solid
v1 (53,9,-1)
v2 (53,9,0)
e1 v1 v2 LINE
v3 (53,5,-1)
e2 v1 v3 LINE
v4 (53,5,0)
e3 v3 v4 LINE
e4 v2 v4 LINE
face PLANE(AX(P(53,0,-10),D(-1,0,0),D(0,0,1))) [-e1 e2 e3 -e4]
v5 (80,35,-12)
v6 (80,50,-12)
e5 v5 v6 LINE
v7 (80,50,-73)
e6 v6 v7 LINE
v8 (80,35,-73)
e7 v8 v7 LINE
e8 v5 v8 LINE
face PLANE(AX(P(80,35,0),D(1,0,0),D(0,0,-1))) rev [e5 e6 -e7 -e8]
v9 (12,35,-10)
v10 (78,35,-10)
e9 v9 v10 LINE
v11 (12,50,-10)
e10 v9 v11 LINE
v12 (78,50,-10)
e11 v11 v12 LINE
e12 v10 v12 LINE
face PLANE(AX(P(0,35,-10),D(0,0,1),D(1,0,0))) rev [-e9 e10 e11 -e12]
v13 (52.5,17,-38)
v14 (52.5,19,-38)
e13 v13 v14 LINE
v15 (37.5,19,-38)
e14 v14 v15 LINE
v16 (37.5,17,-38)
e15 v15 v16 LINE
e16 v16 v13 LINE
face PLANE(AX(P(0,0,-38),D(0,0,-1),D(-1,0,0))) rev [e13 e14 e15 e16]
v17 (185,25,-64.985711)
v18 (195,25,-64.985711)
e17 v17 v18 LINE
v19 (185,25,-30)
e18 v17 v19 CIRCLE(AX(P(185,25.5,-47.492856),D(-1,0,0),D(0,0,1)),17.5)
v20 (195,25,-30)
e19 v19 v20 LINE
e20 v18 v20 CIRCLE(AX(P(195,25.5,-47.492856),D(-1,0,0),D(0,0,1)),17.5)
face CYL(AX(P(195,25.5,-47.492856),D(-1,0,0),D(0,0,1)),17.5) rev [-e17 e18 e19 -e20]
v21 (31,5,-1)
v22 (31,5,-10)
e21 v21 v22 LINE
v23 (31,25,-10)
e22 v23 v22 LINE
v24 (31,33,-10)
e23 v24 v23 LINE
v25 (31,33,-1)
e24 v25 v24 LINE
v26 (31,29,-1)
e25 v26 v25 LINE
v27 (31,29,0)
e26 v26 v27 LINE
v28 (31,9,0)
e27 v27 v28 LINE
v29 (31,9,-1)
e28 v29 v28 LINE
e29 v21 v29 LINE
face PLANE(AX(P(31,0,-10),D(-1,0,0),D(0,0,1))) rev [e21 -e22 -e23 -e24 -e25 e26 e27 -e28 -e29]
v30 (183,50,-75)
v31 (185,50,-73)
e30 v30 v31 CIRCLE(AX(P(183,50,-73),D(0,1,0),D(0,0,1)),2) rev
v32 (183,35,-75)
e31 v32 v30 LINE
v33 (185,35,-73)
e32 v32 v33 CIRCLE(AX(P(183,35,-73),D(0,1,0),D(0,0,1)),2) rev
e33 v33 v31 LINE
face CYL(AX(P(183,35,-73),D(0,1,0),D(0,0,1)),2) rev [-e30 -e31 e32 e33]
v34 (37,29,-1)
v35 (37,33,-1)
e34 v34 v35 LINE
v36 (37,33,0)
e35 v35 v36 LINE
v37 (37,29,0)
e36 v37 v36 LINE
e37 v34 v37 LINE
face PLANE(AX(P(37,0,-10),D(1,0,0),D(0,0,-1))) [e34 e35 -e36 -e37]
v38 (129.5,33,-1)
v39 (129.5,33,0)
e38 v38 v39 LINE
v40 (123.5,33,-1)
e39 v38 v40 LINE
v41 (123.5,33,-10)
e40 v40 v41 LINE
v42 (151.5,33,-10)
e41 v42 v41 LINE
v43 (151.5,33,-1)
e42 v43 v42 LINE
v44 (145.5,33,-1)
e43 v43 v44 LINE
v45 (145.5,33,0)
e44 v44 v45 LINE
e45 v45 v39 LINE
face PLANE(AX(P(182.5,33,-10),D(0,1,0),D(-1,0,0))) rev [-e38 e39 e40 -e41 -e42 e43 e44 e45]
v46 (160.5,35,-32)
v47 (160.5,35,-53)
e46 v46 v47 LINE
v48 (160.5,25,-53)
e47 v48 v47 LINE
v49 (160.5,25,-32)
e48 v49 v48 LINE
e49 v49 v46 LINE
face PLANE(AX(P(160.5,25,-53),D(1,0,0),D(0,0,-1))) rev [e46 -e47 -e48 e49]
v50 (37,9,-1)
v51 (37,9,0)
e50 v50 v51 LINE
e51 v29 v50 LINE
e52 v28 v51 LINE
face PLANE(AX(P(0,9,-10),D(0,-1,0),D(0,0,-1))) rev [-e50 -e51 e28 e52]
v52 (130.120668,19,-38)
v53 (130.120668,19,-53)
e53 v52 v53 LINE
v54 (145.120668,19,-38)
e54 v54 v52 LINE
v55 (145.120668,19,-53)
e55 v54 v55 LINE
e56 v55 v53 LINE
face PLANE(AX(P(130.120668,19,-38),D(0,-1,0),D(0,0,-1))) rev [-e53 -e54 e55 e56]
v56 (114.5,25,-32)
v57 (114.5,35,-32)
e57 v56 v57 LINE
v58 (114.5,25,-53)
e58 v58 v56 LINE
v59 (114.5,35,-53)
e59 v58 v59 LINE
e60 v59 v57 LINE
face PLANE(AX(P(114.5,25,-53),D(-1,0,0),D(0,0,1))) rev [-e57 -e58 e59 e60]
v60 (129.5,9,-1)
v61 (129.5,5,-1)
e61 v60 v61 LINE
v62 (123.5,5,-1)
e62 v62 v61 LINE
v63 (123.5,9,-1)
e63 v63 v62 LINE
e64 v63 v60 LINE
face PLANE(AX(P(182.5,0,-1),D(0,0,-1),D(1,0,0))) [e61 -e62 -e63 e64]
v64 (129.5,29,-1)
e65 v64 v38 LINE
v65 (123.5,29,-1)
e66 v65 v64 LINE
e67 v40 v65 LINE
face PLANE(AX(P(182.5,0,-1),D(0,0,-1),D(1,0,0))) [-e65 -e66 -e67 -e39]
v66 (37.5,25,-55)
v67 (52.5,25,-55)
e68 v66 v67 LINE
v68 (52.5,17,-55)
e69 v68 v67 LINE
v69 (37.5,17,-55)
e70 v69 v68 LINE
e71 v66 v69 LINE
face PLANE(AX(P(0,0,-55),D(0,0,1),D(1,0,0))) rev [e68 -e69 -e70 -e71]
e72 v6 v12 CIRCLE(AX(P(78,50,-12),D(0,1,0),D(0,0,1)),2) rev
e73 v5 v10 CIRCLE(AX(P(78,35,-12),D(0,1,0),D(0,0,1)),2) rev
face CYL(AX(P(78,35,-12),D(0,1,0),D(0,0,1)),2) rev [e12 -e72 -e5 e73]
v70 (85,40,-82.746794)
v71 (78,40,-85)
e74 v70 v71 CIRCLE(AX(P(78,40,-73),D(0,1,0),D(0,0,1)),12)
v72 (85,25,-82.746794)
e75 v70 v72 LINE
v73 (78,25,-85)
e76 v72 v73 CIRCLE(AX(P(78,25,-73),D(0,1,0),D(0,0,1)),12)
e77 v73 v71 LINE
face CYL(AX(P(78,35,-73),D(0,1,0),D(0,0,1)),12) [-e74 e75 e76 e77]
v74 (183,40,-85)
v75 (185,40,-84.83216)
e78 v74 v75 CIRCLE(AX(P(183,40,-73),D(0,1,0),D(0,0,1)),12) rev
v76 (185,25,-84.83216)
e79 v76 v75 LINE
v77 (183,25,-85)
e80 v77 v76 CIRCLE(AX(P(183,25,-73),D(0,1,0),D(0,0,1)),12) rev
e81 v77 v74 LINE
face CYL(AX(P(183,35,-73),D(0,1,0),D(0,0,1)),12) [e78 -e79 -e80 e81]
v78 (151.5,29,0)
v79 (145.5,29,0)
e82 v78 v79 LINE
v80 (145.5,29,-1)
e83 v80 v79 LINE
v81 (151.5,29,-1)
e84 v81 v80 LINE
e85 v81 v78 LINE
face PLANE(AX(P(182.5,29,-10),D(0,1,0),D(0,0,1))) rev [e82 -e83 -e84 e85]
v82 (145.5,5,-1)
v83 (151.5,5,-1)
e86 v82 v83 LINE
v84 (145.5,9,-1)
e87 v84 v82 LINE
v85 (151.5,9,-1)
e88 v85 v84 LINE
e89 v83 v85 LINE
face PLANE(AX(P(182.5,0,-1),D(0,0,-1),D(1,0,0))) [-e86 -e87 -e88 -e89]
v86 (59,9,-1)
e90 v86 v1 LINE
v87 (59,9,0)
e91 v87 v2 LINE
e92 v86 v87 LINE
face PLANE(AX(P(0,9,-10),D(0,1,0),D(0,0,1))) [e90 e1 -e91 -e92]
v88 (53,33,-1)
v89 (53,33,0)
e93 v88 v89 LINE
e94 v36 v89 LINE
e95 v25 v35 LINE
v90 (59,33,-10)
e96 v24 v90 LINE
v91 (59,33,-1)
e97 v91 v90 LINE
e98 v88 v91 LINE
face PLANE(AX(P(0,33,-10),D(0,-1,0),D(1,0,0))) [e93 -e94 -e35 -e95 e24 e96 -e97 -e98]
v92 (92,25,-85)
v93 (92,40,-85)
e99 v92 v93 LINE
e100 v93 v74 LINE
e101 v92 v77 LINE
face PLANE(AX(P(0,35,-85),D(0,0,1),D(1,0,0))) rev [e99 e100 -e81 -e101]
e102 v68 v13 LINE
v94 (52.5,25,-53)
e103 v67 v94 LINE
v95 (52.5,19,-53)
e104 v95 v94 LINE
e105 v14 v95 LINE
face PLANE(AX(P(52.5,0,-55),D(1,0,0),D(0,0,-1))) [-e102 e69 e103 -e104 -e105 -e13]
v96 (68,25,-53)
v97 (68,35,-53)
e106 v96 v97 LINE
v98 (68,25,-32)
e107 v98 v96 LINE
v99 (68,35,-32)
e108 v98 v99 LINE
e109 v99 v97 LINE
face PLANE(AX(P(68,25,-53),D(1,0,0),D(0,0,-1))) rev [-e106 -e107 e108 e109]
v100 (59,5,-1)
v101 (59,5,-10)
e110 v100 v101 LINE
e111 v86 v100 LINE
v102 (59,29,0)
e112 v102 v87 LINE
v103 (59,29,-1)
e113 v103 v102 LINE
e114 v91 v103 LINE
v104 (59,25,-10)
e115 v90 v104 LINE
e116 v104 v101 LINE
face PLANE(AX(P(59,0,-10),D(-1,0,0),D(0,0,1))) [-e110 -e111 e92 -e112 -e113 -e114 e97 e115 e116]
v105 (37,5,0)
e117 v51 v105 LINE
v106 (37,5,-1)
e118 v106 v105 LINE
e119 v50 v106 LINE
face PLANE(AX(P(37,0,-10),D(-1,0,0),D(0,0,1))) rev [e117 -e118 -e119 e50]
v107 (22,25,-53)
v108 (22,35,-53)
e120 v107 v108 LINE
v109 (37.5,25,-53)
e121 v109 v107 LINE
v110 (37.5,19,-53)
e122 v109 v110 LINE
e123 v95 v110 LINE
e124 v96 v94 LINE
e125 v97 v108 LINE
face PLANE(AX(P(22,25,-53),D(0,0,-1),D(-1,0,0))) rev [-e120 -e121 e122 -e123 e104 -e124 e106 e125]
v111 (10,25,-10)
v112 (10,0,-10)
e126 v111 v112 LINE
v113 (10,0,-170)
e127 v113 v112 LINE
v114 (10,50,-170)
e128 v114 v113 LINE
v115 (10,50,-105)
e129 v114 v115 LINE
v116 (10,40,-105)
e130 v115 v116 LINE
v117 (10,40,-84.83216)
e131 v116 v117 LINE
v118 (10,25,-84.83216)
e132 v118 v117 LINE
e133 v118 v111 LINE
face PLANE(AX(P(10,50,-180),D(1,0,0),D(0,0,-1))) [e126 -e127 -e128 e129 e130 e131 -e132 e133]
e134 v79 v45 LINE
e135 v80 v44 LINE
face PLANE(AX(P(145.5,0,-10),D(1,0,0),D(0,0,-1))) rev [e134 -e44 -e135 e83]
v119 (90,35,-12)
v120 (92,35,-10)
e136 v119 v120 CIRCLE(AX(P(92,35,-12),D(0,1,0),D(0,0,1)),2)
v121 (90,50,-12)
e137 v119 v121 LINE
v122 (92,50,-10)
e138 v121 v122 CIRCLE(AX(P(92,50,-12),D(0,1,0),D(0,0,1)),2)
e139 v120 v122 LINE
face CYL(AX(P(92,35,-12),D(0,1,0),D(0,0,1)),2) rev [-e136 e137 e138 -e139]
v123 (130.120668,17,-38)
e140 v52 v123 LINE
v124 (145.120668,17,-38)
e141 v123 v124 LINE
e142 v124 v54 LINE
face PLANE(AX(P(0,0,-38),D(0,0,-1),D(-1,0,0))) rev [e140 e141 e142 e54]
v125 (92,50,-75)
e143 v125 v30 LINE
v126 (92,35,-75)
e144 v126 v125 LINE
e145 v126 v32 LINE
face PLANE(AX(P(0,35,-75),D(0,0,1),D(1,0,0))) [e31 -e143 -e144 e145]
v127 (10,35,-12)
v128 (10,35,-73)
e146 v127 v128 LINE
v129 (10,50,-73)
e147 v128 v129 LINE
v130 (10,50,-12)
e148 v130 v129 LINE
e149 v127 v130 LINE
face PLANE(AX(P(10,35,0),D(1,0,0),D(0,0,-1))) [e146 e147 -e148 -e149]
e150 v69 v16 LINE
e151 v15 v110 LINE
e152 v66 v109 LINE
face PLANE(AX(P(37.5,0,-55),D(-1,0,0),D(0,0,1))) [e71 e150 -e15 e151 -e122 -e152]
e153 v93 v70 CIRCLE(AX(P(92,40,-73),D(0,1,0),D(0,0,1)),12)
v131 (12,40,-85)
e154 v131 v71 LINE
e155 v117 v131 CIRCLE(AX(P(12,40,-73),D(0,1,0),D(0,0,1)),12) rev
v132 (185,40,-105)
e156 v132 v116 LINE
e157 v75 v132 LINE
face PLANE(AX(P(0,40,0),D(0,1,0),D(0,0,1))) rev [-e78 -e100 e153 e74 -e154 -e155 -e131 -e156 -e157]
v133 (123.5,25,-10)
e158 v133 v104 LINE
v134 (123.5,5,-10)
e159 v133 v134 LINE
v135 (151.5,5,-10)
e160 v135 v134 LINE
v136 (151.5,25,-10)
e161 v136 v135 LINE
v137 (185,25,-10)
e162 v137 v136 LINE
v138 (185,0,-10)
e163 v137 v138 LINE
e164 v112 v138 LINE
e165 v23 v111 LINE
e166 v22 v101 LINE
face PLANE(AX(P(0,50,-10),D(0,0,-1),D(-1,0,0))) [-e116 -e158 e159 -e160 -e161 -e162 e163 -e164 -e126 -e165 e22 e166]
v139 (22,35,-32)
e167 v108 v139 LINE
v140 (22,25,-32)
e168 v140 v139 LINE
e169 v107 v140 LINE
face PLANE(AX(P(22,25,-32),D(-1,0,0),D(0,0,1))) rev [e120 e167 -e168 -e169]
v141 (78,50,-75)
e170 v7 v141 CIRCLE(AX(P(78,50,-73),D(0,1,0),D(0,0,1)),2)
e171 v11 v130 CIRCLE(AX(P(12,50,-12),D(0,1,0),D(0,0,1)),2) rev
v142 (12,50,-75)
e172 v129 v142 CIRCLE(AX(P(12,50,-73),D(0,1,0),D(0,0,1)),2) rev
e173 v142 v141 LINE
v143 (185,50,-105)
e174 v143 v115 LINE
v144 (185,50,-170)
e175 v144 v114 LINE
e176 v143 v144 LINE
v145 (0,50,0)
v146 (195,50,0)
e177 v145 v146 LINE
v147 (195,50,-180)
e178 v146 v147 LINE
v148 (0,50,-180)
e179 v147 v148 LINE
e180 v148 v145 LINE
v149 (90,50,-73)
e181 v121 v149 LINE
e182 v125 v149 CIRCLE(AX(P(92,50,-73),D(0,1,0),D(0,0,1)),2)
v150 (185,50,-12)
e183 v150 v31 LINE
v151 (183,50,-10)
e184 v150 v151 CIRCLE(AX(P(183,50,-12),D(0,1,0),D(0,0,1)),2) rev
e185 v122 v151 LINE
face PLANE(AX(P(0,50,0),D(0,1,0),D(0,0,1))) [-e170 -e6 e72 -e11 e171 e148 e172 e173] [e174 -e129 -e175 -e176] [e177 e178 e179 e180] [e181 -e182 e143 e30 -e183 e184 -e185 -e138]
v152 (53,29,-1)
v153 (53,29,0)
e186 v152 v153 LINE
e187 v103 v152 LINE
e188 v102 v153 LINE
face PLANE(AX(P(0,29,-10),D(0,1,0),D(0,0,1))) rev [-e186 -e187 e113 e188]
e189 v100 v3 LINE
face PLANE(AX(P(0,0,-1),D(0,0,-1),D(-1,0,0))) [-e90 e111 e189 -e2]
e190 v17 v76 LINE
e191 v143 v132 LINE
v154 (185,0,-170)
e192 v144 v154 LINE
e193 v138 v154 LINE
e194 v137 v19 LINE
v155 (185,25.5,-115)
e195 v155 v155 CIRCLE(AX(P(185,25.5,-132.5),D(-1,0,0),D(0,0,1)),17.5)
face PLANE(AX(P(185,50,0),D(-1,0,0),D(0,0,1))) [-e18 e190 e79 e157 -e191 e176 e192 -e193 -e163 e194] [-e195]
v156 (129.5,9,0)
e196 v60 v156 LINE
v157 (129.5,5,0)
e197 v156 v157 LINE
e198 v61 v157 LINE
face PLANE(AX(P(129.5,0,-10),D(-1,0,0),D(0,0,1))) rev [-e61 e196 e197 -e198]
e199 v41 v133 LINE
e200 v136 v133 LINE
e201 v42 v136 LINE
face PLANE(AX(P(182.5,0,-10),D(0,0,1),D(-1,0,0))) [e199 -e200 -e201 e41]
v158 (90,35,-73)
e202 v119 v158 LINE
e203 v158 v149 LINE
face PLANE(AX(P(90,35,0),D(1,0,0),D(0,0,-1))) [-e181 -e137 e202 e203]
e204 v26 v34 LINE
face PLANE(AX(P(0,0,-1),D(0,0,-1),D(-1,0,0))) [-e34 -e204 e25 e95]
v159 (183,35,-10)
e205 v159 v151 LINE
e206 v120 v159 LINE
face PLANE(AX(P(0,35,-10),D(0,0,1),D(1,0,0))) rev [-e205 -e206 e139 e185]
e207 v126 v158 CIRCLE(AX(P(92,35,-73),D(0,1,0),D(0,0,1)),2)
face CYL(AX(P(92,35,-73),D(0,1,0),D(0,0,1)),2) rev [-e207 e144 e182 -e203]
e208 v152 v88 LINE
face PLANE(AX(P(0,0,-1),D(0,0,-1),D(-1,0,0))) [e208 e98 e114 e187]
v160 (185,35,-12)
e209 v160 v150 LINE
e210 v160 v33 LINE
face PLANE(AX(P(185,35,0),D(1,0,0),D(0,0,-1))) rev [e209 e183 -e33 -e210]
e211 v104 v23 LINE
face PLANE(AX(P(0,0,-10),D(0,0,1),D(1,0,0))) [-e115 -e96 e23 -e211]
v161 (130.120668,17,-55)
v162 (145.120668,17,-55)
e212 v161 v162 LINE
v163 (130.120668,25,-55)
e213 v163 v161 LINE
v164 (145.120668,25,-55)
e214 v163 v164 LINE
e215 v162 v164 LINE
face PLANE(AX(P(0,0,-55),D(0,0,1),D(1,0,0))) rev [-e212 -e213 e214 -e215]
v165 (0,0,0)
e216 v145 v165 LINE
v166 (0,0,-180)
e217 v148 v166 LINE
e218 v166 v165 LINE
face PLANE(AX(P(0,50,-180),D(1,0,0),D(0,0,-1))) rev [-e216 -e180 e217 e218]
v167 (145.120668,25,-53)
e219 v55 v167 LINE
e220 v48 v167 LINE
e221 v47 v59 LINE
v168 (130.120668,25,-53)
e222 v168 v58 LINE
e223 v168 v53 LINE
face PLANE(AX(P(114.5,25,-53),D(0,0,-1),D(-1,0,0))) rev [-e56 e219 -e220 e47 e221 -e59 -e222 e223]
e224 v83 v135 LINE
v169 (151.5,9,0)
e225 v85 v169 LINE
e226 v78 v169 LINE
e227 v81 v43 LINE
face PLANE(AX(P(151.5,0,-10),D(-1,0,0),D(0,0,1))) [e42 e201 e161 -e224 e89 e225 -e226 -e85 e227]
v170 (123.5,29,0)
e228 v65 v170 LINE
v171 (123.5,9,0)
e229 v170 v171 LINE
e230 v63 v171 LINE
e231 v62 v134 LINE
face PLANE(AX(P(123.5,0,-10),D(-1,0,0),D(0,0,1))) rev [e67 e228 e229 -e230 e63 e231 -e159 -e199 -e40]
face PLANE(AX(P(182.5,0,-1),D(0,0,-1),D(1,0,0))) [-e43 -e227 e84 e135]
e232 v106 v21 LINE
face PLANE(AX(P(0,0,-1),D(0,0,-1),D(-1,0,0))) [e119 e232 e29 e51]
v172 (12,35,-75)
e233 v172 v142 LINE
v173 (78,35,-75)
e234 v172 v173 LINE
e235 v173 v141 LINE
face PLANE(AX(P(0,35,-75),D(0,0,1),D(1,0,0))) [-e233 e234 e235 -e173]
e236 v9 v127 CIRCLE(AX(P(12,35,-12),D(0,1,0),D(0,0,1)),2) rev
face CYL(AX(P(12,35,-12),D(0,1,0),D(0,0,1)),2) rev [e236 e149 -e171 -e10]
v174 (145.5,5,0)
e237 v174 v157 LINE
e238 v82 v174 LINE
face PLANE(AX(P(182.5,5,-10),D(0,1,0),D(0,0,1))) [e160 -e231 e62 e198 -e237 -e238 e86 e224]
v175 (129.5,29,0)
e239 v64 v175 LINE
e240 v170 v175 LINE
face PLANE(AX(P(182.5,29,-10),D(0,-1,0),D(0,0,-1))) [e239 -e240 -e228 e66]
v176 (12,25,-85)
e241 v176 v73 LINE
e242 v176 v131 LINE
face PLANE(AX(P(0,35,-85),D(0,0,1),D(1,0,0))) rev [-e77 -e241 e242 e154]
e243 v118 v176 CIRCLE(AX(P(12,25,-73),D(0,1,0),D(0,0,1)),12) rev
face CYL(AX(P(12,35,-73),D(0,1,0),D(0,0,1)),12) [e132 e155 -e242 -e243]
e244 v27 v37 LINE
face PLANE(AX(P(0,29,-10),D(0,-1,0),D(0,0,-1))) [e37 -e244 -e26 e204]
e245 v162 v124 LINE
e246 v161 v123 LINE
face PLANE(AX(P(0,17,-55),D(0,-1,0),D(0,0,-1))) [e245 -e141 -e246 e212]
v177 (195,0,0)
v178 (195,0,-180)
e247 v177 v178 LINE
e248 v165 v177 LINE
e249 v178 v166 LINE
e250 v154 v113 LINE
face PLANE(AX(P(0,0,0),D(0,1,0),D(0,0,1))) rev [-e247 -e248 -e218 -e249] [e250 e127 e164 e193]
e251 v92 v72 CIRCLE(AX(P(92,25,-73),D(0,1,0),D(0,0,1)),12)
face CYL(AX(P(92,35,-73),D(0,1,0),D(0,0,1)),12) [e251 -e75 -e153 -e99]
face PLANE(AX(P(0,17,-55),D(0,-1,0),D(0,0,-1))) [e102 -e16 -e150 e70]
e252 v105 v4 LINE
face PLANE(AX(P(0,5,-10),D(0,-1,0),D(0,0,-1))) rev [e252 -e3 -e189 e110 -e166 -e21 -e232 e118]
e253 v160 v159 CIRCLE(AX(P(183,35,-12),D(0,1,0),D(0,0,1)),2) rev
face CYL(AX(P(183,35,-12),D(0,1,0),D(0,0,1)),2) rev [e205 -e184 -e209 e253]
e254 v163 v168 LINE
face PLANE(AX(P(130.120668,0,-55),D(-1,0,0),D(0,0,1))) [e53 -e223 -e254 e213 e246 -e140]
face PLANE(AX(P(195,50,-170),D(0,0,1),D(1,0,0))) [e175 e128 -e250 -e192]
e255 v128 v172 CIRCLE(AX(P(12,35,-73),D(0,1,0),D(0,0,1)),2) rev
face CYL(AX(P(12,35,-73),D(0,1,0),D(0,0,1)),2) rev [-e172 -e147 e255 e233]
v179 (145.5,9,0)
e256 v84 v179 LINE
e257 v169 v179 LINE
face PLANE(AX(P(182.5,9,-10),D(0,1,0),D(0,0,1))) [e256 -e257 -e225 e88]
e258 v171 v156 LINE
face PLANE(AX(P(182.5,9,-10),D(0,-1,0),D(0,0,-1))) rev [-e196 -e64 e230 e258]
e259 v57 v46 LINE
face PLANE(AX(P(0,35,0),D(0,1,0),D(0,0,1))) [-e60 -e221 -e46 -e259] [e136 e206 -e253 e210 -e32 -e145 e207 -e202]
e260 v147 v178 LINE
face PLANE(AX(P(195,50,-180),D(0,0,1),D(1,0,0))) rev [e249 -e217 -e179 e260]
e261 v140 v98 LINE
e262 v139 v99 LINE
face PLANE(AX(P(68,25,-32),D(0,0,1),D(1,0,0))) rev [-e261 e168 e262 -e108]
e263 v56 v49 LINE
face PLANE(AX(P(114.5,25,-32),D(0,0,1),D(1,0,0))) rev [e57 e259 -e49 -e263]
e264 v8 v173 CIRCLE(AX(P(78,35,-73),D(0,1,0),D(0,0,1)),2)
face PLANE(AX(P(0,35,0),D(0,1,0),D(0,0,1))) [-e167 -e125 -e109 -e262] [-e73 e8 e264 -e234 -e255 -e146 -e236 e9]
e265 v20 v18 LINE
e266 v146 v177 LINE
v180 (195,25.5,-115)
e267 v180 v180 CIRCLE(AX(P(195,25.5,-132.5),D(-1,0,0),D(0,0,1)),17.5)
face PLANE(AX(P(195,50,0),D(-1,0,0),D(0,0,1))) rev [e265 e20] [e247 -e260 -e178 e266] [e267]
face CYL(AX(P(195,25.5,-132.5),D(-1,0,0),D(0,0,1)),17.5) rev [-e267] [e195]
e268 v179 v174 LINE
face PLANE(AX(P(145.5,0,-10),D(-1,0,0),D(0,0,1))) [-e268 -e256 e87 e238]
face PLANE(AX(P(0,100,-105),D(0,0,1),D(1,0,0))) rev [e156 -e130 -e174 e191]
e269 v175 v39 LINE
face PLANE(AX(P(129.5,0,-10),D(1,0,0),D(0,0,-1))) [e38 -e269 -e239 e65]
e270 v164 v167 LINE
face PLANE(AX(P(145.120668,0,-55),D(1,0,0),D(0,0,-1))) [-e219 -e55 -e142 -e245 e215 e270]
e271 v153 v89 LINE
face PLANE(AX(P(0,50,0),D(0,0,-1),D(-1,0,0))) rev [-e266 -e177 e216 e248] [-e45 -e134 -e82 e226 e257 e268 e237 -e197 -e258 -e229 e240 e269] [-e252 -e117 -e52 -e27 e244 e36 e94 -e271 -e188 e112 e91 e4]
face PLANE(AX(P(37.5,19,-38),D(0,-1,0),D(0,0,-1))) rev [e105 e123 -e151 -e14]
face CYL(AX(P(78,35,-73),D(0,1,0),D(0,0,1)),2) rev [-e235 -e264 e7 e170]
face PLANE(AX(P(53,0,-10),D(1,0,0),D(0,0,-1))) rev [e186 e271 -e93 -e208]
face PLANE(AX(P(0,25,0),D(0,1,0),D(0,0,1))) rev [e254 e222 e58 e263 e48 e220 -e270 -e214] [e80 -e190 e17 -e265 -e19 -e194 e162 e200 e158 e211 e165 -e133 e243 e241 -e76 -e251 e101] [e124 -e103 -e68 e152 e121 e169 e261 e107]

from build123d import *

# Parameters (mm, degrees)
SKETCH2_W            = 195
SKETCH2_H            = 180
BOSS_EXTRUDE1_DEPTH  = 50
CUT_EXTRUDE1_DEPTH   = 15
BOSS_EXTRUDE4_DEPTH  = 50
SKETCH14_W           = 70
SKETCH14_H           = 65
SKETCH14_W_2         = 95
BOSS_EXTRUDE8_DEPTH  = 35
SHELL2_OUTLINE_W     = 175
SHELL2_OUTLINE_H     = 65
SHELL2_DEPTH         = 75
SHELL2_2_OUTLINE_W   = 175
SHELL2_2_OUTLINE_H   = 95
SHELL2_2_DEPTH       = 25
SHELL2_START         = 25
SHELL2_3_DEPTH       = 15
SKETCH15_W           = 46
SKETCH15_H           = 21
CUT_EXTRUDE2_DEPTH   = 10
SKETCH16_W           = 46
SKETCH16_H           = 21
CUT_EXTRUDE3_DEPTH   = 10
SKETCH17_W           = 7.5
SKETCH17_H           = 8
BOSS_EXTRUDE10_DEPTH = 2
SKETCH18_W           = 15
SKETCH18_H           = 2
BOSS_EXTRUDE11_DEPTH = 15
CUT_EXTRUDE5_DEPTH   = 10
CUT_EXTRUDE6_DEPTH   = 9
SKETCH25_W           = 7.379331851
SKETCH25_H           = 8
SKETCH25_W_2         = 7.620668149
BOSS_EXTRUDE12_DEPTH = 2
SKETCH26_W           = 15
SKETCH26_H           = 2
BOSS_EXTRUDE13_DEPTH = 15
SKETCH27_R           = 17.5
CUT_EXTRUDE10_DEPTH  = 10
BOSS_EXTRUDE14_START = -10
BOSS_EXTRUDE14_DEPTH = 10


# Read off the part's stored shape, not the designer's step: Shell2
with BuildPart() as part:
    # Sketch2 → Boss-Extrude1 (new body)
    with BuildSketch(Plane(origin=(0, 0, 0), x_dir=(1, 0, 0), z_dir=(0, 1, 0))):
        with Locations((97.5, 90)):
            Rectangle(SKETCH2_W, SKETCH2_H)
    extrude(amount=BOSS_EXTRUDE1_DEPTH)

    # Sketch3 → Cut-Extrude1 (cut)
    with BuildSketch(Plane(origin=(0, 50, 0), x_dir=(1, 0, 0), z_dir=(0, 1, 0))):
        with BuildLine():
            Line((90, 12), (90, 73))
            ThreePointArc((90, 73), (90.585786438, 74.414213562), (92, 75))
            Line((92, 75), (183, 75))
            ThreePointArc((183, 75), (184.414213562, 74.414213562), (185, 73))
            Line((185, 73), (185, 12))
            ThreePointArc((185, 12), (184.414213562, 10.585786438), (183, 10))
            Line((183, 10), (92, 10))
            ThreePointArc((92, 10), (90.585786438, 10.585786438), (90, 12))
        make_face()
        with BuildLine():
            Line((12, 10), (78, 10))
            ThreePointArc((78, 10), (79.414213562, 10.585786438), (80, 12))
            Line((80, 12), (80, 73))
            ThreePointArc((80, 73), (79.414213562, 74.414213562), (78, 75))
            Line((78, 75), (12, 75))
            ThreePointArc((12, 75), (10.585786438, 74.414213562), (10, 73))
            Line((10, 73), (10, 12))
            ThreePointArc((10, 12), (10.585786438, 10.585786438), (12, 10))
        make_face()
    extrude(amount=-CUT_EXTRUDE1_DEPTH, mode=Mode.SUBTRACT)

    # Sketch6 → Boss-Extrude4 (add)
    with BuildSketch(Plane(origin=(0, 50, 0), x_dir=(1, 0, 0), z_dir=(0, 1, 0))):
        Polygon((0, 180), (185, 180), (195, 180), (195, 95), (185, 95), (0, 95), align=None)
        with BuildLine():
            Line((185, 168), (185, 107))
            ThreePointArc((185, 107), (184.414213562, 105.585786438), (183, 105))
            Line((183, 105), (92, 105))
            ThreePointArc((92, 105), (90.585786438, 105.585786438), (90, 107))
            Line((90, 107), (90, 168))
            ThreePointArc((90, 168), (90.585786438, 169.414213562), (92, 170))
            Line((92, 170), (183, 170))
            ThreePointArc((183, 170), (184.414213562, 169.414213562), (185, 168))
        make_face(mode=Mode.SUBTRACT)
        with BuildLine():
            Line((80, 107), (80, 168))
            ThreePointArc((80, 168), (79.414213562, 169.414213562), (78, 170))
            Line((78, 170), (12, 170))
            ThreePointArc((12, 170), (10.585786438, 169.414213562), (10, 168))
            Line((10, 168), (10, 107))
            ThreePointArc((10, 107), (10.585786438, 105.585786438), (12, 105))
            Line((12, 105), (78, 105))
            ThreePointArc((78, 105), (79.414213562, 105.585786438), (80, 107))
        make_face(mode=Mode.SUBTRACT)
    extrude(amount=BOSS_EXTRUDE4_DEPTH)

    # Sketch14 → Boss-Extrude8 (add)
    with BuildSketch(Plane(origin=(0, 50, 0), x_dir=(1, 0, 0), z_dir=(0, 1, 0))):
        with Locations((45, 137.5)):
            Rectangle(SKETCH14_W, SKETCH14_H)
        with Locations((137.5, 137.5)):
            Rectangle(SKETCH14_W_2, SKETCH14_H)
    extrude(amount=BOSS_EXTRUDE8_DEPTH)

    # Shell2 outline → Shell2 (cut)
    with BuildSketch(Plane(origin=(0, 0, 0), x_dir=(1, 0, 0), z_dir=(0, 1, 0))):
        with Locations((97.5, 137.5)):
            Rectangle(SHELL2_OUTLINE_W, SHELL2_OUTLINE_H)
    extrude(amount=SHELL2_DEPTH, mode=Mode.SUBTRACT)

    # Shell2 2 outline → Shell2 2 (cut)
    with BuildSketch(Plane(origin=(0, 0, 0), x_dir=(1, 0, 0), z_dir=(0, 1, 0))):
        with Locations((97.5, 57.5)):
            Rectangle(SHELL2_2_OUTLINE_W, SHELL2_2_OUTLINE_H)
    extrude(amount=SHELL2_2_DEPTH, mode=Mode.SUBTRACT)

    # Shell2 3 outline → Shell2 3 (cut)
    with BuildSketch(Plane(origin=(0, 0, 0), x_dir=(1, 0, 0), z_dir=(0, 1, 0)).offset(SHELL2_START)):
        with BuildLine():
            Line((10, 105), (10, 84.832159566))
            ThreePointArc((10, 84.832159566), (10.996484877, 84.957966273), (12, 85))
            Line((12, 85), (78, 85))
            ThreePointArc((78, 85), (81.676851089, 84.422817781), (85, 82.746794345))
            ThreePointArc((85, 82.746794345), (88.323148911, 84.422817781), (92, 85))
            Line((92, 85), (183, 85))
            ThreePointArc((183, 85), (184.003515123, 84.957966273), (185, 84.832159566))
            Line((185, 84.832159566), (185, 105))
            Line((185, 105), (10, 105))
        make_face()
    extrude(amount=SHELL2_3_DEPTH, mode=Mode.SUBTRACT)

    # SurfaceCut2
    split(bisect_by=Plane(origin=(0, 50, 0), x_dir=(1, 0, 0), z_dir=(0, 1, 0)), keep=Keep.BOTTOM)

    # Sketch15 → Cut-Extrude2 (cut)
    with BuildSketch(Plane(origin=(0, 35, 0), x_dir=(1, 0, 0), z_dir=(0, 1, 0))):
        with Locations((45, 42.5)):
            Rectangle(SKETCH15_W, SKETCH15_H)
    extrude(amount=-CUT_EXTRUDE2_DEPTH, mode=Mode.SUBTRACT)

    # Sketch16 → Cut-Extrude3 (cut)
    with BuildSketch(Plane(origin=(0, 35, 0), x_dir=(1, 0, 0), z_dir=(0, 1, 0))):
        with Locations((137.5, 42.5)):
            Rectangle(SKETCH16_W, SKETCH16_H)
    extrude(amount=-CUT_EXTRUDE3_DEPTH, mode=Mode.SUBTRACT)

    # Sketch17 → Boss-Extrude10 (add)
    with BuildSketch(Plane.XY.offset(-53)):
        with Locations((48.75, 21)):
            Rectangle(SKETCH17_W, SKETCH17_H)
        with Locations((41.25, 21)):
            Rectangle(SKETCH17_W, SKETCH17_H)
    extrude(amount=-BOSS_EXTRUDE10_DEPTH)

    # Sketch18 → Boss-Extrude11 (add)
    with BuildSketch(Plane.XY.offset(-53)):
        with Locations((45, 18)):
            Rectangle(SKETCH18_W, SKETCH18_H)
    extrude(amount=BOSS_EXTRUDE11_DEPTH)

    # Sketch20 → Cut-Extrude5 (cut)
    with BuildSketch(Plane.XY):
        Polygon((37, 29), (31, 29), (31, 9), (37, 9), (37, 5), (45, 5), (53, 5), (53, 9), (59, 9), (59, 19), (59, 29), (53, 29), (53, 33), (43.658923735, 33), (37, 33), align=None)
    cut_extrude5 = extrude(amount=-CUT_EXTRUDE5_DEPTH, mode=Mode.SUBTRACT)

    # Sketch21 → Cut-Extrude6 (cut)
    with BuildSketch(Plane(origin=(0, 0, -10), x_dir=(-1, 0, 0), z_dir=(0, 0, -1))):
        Polygon((-53, 5), (-31, 5), (-31, 12.573974865), (-31, 33), (-52.681459042, 33), (-59, 33), (-59, 15.767843478), (-59, 5), align=None)
    cut_extrude6 = extrude(amount=-CUT_EXTRUDE6_DEPTH, mode=Mode.SUBTRACT)

    # Sketch25 → Boss-Extrude12 (add)
    with BuildSketch(Plane.XY.offset(-53)):
        with Locations((133.810334075, 21)):
            Rectangle(SKETCH25_W, SKETCH25_H)
        with Locations((141.310334075, 21)):
            Rectangle(SKETCH25_W_2, SKETCH25_H)
    extrude(amount=-BOSS_EXTRUDE12_DEPTH)

    # Sketch26 → Boss-Extrude13 (add)
    with BuildSketch(Plane.XY.offset(-53)):
        with Locations((137.620668149, 18)):
            Rectangle(SKETCH26_W, SKETCH26_H)
    extrude(amount=BOSS_EXTRUDE13_DEPTH)

    # Mirror4: Cut-Extrude5, Cut-Extrude6 across plane
    add(cut_extrude5.mirror(Plane(origin=(91.25, 0, 0), x_dir=(0, 0, 1), z_dir=(1, 0, 0))), mode=Mode.SUBTRACT)
    add(cut_extrude6.mirror(Plane(origin=(91.25, 0, 0), x_dir=(0, 0, 1), z_dir=(1, 0, 0))), mode=Mode.SUBTRACT)

    # Sketch27 → Cut-Extrude10 (cut)
    with BuildSketch(Plane.ZY.offset(-185)):
        with Locations((-132.5, 25.5)):
            Circle(SKETCH27_R)
        with BuildLine():
            ThreePointArc((-64.985711369, 25), (-59.689166602, 12.950099602), (-47.492855685, 8))
            ThreePointArc((-47.492855685, 8), (-35.296544767, 12.950099602), (-30, 25))
            Line((-30, 25), (-64.985711369, 25))
        make_face()
        with BuildLine():
            Line((-64.985711369, 25), (-30, 25))
            ThreePointArc((-30, 25), (-29.994641855, 25.249974481), (-29.992855685, 25.5))
            ThreePointArc((-29.992855685, 25.5), (-47.742881204, 42.99821383), (-64.985711369, 25))
        make_face()
    extrude(amount=-CUT_EXTRUDE10_DEPTH, mode=Mode.SUBTRACT)

    # Sketch28 → Boss-Extrude14 (add)
    with BuildSketch(Plane(origin=(195, 0, 0), x_dir=(0, 0, -1), z_dir=(1, 0, 0)).offset(BOSS_EXTRUDE14_START)):
        with BuildLine():
            Line((30, 25), (64.985711369, 25))
            ThreePointArc((64.985711369, 25), (47.492855685, 43), (30, 25))
        make_face()
    extrude(amount=BOSS_EXTRUDE14_DEPTH)


solid = part.part
